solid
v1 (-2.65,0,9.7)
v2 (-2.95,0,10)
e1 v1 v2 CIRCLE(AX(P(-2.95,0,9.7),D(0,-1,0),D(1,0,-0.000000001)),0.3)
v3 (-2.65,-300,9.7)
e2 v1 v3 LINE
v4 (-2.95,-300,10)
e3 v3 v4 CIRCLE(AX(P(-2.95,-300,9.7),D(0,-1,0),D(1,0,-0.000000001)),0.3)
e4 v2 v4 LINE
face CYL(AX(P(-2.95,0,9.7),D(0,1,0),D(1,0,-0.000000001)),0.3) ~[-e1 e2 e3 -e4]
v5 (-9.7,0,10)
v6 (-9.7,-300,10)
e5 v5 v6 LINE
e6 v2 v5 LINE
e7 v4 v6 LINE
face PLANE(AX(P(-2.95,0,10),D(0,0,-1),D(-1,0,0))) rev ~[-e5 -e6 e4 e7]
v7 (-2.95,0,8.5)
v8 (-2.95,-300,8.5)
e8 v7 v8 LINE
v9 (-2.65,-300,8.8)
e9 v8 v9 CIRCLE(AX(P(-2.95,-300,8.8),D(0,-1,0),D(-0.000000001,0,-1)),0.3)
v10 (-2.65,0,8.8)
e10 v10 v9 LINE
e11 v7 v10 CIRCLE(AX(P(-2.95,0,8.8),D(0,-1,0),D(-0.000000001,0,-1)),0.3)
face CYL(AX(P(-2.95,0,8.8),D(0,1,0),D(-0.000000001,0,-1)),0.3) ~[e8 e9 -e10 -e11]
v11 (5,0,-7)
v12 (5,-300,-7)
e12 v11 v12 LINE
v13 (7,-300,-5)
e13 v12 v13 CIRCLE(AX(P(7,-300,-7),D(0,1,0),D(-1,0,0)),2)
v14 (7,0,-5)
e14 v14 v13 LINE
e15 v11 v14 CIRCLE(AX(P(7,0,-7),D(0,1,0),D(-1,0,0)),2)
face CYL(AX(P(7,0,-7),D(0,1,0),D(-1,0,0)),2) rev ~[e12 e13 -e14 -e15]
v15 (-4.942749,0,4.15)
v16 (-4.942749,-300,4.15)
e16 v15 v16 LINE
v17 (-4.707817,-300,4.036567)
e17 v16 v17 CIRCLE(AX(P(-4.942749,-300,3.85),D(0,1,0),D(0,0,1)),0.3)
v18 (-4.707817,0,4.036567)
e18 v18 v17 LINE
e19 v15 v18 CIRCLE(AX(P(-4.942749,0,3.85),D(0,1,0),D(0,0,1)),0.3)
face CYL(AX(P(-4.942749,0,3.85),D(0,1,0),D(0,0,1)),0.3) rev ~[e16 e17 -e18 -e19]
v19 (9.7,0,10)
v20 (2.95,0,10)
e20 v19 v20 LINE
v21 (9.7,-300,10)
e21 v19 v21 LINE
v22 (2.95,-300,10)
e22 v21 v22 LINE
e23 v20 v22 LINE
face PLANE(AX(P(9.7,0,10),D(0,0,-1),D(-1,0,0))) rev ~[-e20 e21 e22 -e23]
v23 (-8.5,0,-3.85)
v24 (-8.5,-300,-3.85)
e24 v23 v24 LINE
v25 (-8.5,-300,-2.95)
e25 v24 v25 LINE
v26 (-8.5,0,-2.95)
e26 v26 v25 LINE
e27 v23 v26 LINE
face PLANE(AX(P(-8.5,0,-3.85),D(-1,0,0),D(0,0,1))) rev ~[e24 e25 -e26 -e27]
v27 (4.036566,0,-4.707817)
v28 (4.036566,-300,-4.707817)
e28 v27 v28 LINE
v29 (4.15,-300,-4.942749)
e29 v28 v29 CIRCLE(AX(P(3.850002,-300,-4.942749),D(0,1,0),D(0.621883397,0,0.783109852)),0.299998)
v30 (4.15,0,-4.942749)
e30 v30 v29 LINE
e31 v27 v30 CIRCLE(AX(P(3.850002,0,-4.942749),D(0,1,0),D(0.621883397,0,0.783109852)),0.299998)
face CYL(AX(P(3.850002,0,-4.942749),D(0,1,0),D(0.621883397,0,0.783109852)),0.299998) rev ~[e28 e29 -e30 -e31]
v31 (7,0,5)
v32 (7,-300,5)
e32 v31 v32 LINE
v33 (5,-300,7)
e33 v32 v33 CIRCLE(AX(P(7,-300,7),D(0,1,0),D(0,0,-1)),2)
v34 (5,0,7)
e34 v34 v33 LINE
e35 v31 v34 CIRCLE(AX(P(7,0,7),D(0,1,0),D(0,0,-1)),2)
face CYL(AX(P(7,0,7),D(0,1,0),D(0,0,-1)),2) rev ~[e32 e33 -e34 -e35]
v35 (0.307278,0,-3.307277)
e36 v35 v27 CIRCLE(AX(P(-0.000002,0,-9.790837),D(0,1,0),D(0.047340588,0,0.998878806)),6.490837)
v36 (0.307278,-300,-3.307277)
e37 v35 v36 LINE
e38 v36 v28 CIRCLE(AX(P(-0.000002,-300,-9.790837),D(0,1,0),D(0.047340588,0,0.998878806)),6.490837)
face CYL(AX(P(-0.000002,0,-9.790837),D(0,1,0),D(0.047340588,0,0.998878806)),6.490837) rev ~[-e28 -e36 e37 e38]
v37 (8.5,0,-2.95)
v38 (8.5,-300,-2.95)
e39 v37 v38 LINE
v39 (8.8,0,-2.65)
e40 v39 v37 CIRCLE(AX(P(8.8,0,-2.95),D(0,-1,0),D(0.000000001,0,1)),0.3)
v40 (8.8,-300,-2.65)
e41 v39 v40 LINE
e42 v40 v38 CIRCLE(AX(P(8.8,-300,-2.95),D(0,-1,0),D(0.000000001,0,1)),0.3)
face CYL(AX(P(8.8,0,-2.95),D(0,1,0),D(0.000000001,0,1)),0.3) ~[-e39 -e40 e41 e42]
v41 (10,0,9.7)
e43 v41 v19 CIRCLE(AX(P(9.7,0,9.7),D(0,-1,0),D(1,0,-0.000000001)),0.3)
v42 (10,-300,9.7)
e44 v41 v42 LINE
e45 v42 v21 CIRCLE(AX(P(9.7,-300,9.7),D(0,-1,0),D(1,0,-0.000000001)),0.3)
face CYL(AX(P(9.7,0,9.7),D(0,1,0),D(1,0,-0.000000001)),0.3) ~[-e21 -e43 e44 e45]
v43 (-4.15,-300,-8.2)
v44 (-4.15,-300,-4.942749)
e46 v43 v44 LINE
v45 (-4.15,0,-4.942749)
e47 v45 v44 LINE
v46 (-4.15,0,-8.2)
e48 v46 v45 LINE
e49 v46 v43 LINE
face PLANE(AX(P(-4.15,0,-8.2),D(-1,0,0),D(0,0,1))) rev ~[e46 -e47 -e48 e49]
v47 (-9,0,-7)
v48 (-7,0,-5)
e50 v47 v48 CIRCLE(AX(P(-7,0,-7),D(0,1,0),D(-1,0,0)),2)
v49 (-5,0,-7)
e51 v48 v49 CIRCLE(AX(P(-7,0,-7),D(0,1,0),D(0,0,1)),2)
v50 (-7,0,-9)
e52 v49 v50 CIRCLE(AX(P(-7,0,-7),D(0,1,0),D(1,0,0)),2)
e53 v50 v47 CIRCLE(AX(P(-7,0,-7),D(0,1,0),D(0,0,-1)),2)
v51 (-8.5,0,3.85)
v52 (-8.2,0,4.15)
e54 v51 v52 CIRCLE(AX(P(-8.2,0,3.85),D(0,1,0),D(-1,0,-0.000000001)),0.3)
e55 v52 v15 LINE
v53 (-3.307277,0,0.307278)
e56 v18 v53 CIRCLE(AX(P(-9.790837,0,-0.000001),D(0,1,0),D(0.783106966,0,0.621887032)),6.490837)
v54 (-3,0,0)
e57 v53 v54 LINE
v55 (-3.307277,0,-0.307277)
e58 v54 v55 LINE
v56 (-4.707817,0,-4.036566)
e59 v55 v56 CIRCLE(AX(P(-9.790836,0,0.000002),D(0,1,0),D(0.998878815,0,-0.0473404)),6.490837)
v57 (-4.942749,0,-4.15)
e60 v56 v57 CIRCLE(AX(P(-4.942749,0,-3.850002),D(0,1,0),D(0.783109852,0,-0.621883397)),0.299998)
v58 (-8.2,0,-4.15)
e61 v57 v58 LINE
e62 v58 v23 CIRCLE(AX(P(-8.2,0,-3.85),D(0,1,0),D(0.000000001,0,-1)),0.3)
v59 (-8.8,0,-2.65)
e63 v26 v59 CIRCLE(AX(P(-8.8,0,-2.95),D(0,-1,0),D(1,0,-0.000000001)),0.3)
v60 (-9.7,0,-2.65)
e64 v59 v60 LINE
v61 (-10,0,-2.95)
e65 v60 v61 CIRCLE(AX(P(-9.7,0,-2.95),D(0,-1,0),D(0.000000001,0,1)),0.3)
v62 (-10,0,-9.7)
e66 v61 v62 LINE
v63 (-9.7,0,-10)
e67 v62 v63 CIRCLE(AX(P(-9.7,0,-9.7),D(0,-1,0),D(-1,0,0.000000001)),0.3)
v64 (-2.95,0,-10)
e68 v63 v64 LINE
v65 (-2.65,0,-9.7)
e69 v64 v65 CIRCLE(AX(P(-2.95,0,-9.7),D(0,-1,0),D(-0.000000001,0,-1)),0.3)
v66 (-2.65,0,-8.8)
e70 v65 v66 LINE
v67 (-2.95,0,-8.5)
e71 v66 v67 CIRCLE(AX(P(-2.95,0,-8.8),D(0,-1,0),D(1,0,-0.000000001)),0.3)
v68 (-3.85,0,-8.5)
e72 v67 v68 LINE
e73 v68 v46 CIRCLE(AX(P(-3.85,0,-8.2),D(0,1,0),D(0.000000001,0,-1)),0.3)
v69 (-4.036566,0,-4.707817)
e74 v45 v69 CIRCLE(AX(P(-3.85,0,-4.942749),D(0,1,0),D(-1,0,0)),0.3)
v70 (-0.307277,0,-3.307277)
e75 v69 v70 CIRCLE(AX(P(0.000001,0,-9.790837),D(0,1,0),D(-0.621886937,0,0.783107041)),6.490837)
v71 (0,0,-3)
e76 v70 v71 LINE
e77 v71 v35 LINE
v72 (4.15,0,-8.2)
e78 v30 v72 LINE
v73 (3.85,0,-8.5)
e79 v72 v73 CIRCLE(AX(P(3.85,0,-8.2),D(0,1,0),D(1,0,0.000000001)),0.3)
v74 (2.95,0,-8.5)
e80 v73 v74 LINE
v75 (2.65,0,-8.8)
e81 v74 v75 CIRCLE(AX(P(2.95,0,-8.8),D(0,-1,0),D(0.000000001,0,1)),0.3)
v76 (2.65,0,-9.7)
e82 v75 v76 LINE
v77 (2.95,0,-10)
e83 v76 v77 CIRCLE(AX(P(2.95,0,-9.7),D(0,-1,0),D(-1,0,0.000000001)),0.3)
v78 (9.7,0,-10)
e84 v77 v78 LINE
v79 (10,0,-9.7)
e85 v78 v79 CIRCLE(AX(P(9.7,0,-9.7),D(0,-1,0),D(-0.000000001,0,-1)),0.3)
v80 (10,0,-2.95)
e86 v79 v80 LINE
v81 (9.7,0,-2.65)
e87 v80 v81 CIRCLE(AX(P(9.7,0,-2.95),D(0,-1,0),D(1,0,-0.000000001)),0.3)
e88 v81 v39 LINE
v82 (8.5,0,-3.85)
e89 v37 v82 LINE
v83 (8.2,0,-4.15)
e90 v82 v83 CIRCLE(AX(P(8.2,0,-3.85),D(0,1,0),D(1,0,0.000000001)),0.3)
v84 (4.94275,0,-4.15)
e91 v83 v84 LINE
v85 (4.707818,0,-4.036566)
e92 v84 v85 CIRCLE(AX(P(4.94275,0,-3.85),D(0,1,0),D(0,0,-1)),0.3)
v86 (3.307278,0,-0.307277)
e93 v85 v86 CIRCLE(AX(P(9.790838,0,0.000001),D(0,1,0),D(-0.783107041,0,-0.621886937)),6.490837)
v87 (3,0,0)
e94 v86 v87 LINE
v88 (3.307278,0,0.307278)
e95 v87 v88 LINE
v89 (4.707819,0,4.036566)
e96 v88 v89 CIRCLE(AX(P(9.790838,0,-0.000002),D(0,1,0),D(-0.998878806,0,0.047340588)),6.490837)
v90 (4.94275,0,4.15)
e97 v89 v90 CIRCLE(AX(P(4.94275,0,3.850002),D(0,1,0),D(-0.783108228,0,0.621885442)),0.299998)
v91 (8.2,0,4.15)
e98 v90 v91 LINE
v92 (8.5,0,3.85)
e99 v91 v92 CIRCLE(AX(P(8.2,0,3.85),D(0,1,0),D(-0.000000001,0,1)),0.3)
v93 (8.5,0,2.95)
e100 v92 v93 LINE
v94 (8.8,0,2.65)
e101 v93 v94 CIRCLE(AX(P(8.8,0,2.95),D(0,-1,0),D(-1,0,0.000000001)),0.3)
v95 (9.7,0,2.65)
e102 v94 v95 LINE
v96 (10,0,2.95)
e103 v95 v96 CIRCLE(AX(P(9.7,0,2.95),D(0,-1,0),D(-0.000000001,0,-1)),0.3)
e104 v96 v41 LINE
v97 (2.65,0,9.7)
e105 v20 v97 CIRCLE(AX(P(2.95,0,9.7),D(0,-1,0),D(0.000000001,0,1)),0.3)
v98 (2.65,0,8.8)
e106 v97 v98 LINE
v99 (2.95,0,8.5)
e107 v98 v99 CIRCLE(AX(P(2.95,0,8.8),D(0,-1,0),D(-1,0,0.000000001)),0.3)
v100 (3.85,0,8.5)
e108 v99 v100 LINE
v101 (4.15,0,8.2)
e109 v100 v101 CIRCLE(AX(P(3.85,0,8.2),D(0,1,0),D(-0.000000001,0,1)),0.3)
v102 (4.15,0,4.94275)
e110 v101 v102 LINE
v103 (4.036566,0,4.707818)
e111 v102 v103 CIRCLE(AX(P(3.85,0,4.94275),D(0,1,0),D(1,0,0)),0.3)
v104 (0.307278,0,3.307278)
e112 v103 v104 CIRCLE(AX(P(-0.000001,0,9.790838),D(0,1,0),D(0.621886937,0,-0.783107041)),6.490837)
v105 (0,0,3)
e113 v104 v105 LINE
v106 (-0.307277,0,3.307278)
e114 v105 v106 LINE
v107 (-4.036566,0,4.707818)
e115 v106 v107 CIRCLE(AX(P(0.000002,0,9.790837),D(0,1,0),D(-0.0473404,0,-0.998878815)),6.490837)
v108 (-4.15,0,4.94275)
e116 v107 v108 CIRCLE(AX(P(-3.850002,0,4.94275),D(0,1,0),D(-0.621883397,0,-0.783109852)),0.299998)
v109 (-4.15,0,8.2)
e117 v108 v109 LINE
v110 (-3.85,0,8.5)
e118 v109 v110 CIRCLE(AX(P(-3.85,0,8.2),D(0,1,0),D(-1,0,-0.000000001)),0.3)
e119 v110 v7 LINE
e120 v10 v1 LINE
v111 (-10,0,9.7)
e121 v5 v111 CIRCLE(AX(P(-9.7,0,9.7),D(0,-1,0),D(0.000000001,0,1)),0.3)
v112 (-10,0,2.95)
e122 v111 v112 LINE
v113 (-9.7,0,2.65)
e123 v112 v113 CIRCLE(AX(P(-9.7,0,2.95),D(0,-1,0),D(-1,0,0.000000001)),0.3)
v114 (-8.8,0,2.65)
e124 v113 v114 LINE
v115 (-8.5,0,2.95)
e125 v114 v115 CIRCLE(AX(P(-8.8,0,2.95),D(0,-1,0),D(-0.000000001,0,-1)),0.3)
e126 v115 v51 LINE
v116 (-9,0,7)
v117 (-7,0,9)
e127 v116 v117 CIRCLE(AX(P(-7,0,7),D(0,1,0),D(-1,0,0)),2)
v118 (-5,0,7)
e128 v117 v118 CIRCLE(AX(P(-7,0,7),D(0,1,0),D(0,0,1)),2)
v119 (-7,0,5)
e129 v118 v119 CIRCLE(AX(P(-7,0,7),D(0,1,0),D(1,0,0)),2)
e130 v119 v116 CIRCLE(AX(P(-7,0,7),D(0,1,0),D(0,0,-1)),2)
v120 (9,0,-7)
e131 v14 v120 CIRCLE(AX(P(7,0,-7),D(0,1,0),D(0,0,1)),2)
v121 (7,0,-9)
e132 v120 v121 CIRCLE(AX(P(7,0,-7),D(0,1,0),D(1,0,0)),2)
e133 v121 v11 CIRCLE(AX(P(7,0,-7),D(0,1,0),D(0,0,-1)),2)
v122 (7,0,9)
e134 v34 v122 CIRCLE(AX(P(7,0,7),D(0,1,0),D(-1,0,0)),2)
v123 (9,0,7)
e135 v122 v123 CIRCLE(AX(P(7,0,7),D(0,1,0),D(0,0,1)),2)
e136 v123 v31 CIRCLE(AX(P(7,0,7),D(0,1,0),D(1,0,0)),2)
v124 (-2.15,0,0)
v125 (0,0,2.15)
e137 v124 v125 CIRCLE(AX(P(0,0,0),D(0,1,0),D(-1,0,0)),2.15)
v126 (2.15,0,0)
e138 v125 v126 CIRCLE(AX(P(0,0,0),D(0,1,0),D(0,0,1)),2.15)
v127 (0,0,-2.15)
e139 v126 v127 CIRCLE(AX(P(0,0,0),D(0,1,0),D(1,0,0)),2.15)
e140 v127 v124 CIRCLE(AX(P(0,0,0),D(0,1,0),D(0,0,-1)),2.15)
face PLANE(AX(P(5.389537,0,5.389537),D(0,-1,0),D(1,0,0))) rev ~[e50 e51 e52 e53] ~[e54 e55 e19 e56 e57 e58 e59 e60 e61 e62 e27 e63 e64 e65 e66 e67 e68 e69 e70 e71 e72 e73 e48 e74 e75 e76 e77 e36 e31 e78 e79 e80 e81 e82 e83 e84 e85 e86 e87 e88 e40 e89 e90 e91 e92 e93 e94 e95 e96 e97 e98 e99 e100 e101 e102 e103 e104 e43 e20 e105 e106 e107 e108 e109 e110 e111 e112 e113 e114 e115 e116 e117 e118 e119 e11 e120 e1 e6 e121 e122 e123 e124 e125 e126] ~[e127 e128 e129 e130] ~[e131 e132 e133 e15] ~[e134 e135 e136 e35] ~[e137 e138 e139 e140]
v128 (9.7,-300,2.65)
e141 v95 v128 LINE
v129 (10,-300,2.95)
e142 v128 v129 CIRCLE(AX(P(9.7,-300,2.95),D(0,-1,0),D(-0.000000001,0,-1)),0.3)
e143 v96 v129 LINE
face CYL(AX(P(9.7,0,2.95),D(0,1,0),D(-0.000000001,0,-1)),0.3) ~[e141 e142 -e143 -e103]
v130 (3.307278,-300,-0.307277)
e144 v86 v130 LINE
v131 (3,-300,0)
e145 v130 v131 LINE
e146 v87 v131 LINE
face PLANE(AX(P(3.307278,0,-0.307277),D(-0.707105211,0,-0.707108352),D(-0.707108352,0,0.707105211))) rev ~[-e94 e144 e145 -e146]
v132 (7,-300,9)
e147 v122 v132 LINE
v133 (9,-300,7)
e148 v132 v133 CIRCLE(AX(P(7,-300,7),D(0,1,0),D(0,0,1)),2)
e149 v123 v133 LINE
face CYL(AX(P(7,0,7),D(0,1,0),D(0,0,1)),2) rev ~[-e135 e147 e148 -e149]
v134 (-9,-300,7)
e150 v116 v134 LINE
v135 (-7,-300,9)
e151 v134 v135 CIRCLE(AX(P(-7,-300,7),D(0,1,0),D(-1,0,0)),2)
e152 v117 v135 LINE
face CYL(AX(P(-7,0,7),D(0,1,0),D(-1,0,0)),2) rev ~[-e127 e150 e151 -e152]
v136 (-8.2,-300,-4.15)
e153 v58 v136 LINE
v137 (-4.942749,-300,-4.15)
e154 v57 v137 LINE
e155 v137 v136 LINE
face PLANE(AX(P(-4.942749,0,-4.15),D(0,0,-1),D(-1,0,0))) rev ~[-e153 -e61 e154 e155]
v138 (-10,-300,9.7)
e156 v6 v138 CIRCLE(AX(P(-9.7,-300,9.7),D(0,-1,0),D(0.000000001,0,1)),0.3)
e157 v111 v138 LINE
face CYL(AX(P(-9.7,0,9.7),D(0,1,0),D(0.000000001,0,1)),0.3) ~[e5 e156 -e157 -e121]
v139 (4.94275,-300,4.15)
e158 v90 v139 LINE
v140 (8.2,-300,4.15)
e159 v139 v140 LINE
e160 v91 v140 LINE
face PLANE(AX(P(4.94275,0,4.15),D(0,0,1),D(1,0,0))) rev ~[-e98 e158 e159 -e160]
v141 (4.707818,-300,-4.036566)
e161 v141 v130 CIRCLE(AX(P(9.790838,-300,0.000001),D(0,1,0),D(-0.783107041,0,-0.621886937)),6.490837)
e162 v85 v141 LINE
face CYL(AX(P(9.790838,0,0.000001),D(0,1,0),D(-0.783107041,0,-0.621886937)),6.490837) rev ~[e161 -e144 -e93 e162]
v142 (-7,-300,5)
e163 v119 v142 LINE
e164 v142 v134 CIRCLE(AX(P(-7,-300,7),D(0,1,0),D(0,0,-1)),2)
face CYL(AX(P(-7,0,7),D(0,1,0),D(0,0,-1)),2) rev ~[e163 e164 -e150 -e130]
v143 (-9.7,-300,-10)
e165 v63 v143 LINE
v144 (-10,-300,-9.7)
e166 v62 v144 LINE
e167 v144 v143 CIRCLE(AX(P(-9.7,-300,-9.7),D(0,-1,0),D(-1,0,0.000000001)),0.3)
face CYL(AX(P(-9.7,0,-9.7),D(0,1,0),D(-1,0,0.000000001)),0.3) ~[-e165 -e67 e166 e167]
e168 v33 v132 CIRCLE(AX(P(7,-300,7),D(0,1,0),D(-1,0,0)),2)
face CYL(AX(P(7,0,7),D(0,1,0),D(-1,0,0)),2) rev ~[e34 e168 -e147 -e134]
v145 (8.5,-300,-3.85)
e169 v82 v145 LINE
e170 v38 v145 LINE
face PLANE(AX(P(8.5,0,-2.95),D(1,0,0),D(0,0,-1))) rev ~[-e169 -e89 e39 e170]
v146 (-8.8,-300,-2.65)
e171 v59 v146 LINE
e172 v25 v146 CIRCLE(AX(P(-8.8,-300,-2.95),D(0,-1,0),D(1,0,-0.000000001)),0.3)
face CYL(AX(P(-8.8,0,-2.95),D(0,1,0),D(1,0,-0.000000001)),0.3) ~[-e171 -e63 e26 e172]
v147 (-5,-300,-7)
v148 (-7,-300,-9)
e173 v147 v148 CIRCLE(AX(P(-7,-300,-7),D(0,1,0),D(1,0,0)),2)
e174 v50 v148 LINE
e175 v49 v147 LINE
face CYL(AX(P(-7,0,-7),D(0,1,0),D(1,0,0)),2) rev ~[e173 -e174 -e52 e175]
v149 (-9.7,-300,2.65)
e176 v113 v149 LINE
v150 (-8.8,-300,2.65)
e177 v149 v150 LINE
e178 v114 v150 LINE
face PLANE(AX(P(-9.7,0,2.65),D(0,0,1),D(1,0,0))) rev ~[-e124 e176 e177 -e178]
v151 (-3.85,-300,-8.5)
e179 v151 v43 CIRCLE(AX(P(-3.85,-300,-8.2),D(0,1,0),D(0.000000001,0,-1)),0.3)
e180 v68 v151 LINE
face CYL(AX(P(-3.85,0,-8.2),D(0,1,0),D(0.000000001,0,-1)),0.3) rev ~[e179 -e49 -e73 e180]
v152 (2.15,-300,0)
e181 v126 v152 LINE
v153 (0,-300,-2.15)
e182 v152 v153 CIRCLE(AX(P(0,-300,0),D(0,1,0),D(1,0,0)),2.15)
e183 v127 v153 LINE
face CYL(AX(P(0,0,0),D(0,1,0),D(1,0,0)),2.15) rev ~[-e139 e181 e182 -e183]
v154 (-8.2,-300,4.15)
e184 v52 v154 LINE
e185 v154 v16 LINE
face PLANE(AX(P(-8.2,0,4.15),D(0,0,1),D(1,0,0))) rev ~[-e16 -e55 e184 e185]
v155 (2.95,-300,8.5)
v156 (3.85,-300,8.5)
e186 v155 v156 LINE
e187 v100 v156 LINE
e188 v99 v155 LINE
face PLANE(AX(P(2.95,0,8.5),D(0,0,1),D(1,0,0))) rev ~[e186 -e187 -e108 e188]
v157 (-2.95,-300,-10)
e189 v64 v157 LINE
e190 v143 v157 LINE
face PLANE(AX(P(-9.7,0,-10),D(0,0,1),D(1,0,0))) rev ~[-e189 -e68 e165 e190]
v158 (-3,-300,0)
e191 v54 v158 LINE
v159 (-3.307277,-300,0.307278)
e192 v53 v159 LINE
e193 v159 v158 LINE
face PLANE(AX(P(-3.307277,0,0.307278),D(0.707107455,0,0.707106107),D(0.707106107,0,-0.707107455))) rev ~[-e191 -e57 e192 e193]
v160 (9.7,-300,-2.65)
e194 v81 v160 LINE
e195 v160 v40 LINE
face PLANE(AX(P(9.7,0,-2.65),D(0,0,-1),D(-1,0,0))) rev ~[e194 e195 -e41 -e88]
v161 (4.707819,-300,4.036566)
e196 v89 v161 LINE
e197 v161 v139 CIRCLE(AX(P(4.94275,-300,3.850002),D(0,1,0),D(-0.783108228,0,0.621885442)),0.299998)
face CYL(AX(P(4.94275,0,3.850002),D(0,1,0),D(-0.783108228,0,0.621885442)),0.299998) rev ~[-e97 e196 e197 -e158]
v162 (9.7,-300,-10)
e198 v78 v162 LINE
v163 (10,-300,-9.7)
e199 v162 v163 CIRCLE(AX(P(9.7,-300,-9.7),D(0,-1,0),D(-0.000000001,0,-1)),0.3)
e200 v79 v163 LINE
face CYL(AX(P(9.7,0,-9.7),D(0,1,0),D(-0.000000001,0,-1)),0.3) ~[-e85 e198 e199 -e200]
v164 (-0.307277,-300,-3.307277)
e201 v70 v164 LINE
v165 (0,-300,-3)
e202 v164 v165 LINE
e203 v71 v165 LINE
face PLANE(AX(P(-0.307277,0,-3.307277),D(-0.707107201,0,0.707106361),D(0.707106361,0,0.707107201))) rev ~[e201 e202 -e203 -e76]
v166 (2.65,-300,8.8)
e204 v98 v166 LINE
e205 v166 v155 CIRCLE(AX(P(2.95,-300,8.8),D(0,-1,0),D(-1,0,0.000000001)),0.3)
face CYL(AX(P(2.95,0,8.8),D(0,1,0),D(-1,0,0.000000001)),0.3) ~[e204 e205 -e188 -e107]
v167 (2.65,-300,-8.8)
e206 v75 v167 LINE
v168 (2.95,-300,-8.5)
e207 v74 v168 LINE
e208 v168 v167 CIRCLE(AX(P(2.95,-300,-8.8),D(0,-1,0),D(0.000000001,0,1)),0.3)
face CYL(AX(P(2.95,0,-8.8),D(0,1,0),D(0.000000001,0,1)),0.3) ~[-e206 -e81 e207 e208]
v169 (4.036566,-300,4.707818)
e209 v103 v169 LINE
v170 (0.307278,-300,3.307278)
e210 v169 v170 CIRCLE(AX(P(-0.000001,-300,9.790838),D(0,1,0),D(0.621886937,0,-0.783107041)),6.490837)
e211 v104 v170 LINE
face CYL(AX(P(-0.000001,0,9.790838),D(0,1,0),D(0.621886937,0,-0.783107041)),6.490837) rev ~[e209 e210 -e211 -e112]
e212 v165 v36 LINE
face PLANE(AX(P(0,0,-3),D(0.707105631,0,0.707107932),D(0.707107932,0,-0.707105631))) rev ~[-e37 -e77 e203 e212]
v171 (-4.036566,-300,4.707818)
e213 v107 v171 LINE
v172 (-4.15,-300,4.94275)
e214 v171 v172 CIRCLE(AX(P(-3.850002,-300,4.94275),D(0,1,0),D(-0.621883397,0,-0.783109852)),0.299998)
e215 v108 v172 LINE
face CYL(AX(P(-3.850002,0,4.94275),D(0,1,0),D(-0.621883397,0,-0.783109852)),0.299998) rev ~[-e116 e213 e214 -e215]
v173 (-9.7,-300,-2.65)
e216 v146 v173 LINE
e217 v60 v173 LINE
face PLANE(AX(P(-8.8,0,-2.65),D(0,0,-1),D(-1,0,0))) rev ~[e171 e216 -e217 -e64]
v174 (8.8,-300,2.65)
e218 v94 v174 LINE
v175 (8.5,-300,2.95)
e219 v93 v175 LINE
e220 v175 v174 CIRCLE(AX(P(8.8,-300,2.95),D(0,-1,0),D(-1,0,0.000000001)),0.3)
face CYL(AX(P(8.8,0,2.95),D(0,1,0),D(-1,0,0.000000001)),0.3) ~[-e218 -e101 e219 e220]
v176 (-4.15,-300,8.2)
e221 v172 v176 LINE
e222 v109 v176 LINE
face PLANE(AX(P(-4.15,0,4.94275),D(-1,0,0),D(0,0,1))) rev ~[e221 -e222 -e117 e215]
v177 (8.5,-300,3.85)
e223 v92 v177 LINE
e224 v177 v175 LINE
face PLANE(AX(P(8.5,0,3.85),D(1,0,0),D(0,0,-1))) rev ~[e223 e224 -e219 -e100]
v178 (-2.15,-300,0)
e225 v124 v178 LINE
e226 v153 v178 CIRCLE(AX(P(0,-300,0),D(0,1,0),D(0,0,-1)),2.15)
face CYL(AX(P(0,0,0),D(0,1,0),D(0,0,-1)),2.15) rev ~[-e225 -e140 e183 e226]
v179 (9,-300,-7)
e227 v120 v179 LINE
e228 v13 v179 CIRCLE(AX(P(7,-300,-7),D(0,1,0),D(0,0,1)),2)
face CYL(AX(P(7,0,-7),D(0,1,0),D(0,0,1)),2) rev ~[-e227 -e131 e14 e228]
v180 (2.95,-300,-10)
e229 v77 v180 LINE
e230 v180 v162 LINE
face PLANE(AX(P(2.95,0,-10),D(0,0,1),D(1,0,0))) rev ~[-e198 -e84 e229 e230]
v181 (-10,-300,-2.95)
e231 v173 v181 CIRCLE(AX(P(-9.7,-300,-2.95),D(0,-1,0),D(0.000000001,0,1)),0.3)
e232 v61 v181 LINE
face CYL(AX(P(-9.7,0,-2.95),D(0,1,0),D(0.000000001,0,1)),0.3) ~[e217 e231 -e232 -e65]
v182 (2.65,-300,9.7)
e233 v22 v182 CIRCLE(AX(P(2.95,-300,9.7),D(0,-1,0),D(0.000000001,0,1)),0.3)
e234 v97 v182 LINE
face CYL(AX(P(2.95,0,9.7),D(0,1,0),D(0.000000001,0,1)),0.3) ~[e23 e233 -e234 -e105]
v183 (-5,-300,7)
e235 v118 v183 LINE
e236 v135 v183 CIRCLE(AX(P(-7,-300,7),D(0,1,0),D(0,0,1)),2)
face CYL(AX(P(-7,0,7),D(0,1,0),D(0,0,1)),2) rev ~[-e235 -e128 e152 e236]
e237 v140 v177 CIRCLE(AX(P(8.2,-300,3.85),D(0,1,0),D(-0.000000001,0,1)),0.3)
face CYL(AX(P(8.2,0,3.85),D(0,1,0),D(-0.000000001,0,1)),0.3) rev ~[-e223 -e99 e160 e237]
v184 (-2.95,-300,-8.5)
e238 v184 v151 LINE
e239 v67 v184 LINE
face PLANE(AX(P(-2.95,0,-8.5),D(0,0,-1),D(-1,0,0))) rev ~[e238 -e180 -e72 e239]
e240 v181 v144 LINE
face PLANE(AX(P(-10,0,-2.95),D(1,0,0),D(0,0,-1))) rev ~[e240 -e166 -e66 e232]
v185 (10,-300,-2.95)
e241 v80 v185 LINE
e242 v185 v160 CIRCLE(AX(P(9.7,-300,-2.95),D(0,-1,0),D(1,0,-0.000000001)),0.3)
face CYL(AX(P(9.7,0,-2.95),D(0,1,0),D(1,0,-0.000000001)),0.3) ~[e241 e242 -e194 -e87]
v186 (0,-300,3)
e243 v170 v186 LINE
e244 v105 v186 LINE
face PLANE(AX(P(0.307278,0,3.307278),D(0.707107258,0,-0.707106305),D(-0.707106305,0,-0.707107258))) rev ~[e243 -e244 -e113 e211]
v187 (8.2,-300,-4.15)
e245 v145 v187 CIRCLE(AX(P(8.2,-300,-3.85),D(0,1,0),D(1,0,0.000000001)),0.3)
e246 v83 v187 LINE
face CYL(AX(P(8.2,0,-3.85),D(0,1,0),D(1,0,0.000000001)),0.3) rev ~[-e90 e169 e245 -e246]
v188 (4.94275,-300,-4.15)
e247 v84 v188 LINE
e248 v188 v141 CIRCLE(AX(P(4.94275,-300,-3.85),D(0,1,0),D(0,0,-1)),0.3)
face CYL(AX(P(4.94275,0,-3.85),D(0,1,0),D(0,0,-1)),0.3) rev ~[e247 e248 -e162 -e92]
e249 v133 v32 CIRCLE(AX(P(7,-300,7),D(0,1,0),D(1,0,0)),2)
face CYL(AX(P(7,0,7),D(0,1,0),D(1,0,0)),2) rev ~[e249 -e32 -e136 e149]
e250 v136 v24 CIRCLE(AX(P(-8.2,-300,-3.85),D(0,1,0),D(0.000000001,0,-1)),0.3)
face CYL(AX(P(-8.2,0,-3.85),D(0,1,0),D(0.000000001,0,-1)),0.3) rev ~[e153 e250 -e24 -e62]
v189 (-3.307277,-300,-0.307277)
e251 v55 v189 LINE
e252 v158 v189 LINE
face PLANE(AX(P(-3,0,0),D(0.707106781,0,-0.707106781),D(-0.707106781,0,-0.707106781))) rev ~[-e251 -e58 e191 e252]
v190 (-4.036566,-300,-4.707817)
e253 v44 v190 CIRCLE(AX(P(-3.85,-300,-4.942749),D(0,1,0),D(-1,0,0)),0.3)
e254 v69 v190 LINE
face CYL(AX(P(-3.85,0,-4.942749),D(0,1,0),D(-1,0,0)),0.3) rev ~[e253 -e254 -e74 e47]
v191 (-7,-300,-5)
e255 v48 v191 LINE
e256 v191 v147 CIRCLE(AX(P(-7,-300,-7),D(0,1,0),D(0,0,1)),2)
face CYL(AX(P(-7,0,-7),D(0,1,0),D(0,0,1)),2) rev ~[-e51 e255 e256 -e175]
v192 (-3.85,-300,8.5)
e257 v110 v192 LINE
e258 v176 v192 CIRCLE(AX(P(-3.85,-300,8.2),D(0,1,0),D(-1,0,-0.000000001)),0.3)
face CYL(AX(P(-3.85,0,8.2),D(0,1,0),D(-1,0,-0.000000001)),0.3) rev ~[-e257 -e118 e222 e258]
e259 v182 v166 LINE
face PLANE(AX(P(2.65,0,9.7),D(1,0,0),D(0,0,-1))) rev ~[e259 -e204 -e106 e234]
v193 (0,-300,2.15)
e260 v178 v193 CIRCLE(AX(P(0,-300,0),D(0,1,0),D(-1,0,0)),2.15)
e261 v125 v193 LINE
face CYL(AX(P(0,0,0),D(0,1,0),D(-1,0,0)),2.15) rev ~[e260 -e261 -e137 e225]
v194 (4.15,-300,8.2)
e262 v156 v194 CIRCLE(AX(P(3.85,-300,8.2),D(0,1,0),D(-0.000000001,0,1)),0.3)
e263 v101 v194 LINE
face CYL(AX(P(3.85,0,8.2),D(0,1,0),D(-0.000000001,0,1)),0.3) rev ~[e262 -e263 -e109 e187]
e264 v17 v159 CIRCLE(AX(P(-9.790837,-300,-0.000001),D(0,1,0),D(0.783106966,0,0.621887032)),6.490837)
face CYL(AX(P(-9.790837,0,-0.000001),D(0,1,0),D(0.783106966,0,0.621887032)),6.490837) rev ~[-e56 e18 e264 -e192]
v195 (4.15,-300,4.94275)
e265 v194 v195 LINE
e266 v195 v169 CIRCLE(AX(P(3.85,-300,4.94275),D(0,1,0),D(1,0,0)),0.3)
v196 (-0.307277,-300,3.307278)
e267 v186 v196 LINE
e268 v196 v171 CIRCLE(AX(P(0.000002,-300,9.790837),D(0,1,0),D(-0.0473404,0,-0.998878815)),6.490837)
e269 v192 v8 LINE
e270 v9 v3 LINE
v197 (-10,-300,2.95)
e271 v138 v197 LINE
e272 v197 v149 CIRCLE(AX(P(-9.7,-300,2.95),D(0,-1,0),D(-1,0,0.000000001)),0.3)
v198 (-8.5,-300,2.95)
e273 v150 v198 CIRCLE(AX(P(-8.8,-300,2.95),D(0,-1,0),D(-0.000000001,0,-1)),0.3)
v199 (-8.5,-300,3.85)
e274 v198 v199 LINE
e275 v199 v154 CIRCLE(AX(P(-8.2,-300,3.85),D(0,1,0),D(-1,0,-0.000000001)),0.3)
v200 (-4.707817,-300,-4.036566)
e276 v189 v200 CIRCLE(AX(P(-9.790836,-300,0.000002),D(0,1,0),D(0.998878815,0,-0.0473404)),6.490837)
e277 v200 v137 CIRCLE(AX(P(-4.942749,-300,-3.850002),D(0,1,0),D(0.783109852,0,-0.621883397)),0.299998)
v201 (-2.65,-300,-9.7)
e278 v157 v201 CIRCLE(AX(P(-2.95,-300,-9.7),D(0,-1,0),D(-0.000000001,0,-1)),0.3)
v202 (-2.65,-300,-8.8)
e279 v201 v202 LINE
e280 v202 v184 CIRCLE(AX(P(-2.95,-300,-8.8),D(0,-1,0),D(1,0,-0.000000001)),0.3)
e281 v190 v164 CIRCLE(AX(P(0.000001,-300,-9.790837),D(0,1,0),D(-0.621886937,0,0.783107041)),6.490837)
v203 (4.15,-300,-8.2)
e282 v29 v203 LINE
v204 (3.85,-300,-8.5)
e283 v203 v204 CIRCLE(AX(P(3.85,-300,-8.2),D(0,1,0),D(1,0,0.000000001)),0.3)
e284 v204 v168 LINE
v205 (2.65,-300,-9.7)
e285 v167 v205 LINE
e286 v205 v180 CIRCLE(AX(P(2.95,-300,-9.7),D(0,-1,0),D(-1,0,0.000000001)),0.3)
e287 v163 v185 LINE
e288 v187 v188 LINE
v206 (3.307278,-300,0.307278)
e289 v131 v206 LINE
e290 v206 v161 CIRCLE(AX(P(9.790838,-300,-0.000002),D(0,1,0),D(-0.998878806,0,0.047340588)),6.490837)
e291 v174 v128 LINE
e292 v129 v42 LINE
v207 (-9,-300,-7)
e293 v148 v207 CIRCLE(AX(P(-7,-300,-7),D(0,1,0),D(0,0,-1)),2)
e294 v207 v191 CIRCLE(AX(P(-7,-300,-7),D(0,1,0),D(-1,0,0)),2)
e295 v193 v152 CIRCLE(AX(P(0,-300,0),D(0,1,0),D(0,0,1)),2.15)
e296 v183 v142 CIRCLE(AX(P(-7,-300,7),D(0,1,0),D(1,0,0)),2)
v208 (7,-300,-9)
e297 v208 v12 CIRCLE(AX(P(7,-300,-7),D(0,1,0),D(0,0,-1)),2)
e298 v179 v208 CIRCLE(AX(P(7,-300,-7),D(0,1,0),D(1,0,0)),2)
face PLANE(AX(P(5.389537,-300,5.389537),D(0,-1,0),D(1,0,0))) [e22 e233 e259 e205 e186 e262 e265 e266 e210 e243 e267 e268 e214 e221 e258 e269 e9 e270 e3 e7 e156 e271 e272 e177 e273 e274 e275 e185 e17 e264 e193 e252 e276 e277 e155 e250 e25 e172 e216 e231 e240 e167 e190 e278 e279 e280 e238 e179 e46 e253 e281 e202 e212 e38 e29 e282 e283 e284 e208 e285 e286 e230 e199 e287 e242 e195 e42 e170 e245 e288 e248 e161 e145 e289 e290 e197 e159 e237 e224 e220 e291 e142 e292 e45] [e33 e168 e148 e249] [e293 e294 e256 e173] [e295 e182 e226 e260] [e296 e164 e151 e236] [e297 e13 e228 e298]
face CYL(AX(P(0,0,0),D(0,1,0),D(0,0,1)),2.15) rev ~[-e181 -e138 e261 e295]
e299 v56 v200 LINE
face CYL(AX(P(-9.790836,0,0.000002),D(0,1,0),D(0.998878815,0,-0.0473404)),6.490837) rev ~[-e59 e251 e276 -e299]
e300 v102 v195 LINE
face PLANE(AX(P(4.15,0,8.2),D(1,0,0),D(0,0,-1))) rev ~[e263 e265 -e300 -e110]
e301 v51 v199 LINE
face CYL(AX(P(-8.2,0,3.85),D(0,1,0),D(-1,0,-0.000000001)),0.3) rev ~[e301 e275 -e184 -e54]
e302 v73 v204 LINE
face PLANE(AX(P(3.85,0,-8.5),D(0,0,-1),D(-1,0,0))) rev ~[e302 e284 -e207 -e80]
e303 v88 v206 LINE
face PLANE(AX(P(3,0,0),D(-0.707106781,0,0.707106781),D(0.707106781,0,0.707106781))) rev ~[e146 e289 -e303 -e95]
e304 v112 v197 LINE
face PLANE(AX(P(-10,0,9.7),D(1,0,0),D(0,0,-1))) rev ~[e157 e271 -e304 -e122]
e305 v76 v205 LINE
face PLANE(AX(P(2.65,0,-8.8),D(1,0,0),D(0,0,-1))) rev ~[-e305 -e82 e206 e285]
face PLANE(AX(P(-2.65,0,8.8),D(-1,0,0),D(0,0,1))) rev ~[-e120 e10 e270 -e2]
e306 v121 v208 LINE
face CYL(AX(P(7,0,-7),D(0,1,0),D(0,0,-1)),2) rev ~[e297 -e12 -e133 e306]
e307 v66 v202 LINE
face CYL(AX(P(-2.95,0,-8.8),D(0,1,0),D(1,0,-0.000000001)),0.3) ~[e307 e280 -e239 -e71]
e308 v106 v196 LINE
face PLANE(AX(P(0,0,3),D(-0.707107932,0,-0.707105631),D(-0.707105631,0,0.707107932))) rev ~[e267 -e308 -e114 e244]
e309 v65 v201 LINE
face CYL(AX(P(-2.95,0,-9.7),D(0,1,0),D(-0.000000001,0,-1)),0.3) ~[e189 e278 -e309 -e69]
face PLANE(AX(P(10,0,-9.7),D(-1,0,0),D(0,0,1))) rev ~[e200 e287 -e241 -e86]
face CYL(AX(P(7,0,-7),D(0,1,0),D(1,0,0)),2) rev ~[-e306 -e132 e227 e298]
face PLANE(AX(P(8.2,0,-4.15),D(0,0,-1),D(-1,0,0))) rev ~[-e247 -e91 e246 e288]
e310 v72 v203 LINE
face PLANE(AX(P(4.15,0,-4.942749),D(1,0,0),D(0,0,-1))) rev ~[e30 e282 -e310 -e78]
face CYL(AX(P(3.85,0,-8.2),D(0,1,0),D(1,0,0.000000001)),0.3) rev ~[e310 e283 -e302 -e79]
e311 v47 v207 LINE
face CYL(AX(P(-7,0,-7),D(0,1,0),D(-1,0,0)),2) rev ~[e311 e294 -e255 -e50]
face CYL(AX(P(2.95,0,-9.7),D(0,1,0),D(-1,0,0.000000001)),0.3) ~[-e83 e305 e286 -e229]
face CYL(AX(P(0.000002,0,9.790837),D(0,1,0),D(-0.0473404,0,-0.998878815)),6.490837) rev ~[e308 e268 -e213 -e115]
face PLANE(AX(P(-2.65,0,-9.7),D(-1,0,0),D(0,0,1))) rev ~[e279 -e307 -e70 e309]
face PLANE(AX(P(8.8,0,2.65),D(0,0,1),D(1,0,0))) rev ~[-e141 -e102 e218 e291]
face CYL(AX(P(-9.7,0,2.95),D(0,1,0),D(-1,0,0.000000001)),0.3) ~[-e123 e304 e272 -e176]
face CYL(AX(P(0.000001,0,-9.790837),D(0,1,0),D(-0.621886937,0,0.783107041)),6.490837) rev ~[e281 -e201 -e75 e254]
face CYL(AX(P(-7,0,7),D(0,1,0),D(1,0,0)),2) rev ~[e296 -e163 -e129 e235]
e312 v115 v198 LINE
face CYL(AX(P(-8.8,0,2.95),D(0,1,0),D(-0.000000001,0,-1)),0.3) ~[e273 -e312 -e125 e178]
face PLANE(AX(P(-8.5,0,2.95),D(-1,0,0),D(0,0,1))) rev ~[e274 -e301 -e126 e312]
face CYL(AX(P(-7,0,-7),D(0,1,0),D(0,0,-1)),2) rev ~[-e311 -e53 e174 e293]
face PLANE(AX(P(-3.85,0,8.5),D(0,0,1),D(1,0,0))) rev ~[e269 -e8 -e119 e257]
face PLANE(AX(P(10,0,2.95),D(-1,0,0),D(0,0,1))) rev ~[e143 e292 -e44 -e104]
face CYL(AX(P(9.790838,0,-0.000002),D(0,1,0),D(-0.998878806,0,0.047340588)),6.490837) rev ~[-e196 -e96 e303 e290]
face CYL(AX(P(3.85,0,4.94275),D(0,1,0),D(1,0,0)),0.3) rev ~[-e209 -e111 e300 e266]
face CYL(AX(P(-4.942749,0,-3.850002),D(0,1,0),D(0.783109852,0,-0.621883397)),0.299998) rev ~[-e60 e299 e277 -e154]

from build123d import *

# Parameters (mm, degrees)
F1_DEPTH = 300


# Not quite as in the source:
# - ends of sketch curves that miss each other by under 0.0002 mm in the source are joined


with BuildPart() as f1:
    # F0 (on Front) → F1 (new body)
    with BuildSketch(Plane.XZ):
        with BuildLine():
            ThreePointArc((0, 2.15), (1.5202795796, 1.5202795796), (2.15, 0))
            Line((2.15, 0), (3, 0))
            Line((3, 0), (3.307278, 0.307278))
            ThreePointArc((3.307278, 0.307278), (3.7143803747, 2.2820219924), (4.7078187099, 4.0365664363))
            ThreePointArc((4.7078187099, 4.0365664363), (4.812308461, 4.1201573706), (4.94275, 4.15))
            Line((4.94275, 4.15), (8.2, 4.15))
            ThreePointArc((8.2, 4.15), (8.4121320344, 4.0621320344), (8.5, 3.85))
            Line((8.5, 3.85), (8.5, 2.95))
            ThreePointArc((8.5, 2.95), (8.5878679656, 2.7378679656), (8.8, 2.65))
            Line((8.8, 2.65), (9.7, 2.65))
            ThreePointArc((9.7, 2.65), (9.9121320344, 2.7378679656), (10, 2.95))
            Line((10, 2.95), (10, 9.7))
            ThreePointArc((10, 9.7), (9.9121320344, 9.9121320344), (9.7, 10))
            Line((9.7, 10), (2.95, 10))
            ThreePointArc((2.95, 10), (2.7378679656, 9.9121320344), (2.65, 9.7))
            Line((2.65, 9.7), (2.65, 8.8))
            ThreePointArc((2.65, 8.8), (2.7378679656, 8.5878679656), (2.95, 8.5))
            Line((2.95, 8.5), (3.85, 8.5))
            ThreePointArc((3.85, 8.5), (4.0621320344, 8.4121320344), (4.15, 8.2))
            Line((4.15, 8.2), (4.15, 4.94275))
            ThreePointArc((4.15, 4.94275), (4.1201572004, 4.8123081084), (4.036566086, 4.7078178916))
            ThreePointArc((4.036566086, 4.7078178916), (2.2820216259, 3.7143802371), (0.3072779813, 3.3072783955))
            Line((0.3072779813, 3.3072783955), (0, 3))
            Line((0, 3), (0, 2.15))
        make_face()
        with BuildLine():
            ThreePointArc((7, 9), (8.4142135624, 8.4142135624), (9, 7))
            ThreePointArc((9, 7), (8.4142135624, 5.5857864376), (7, 5))
            ThreePointArc((7, 5), (5.5857864376, 5.5857864376), (5, 7))
            ThreePointArc((5, 7), (5.5857864376, 8.4142135624), (7, 9))
        make_face(mode=Mode.SUBTRACT)
        with BuildLine():
            Line((3, 0), (2.15, 0))
            ThreePointArc((2.15, 0), (1.5202795796, -1.5202795796), (0, -2.15))
            Line((0, -2.15), (0, -3))
            Line((0, -3), (0.307278, -3.307277))
            ThreePointArc((0.307278, -3.307277), (2.2820216259, -3.7143792371), (4.036565823, -4.7078172229))
            ThreePointArc((4.036565823, -4.7078172229), (4.1201572004, -4.8123071084), (4.15, -4.942749))
            Line((4.15, -4.942749), (4.15, -8.2))
            ThreePointArc((4.15, -8.2), (4.0621320344, -8.4121320344), (3.85, -8.5))
            Line((3.85, -8.5), (2.95, -8.5))
            ThreePointArc((2.95, -8.5), (2.7378679656, -8.5878679656), (2.65, -8.8))
            Line((2.65, -8.8), (2.65, -9.7))
            ThreePointArc((2.65, -9.7), (2.7378679656, -9.9121320344), (2.95, -10))
            Line((2.95, -10), (9.7, -10))
            ThreePointArc((9.7, -10), (9.9121320344, -9.9121320344), (10, -9.7))
            Line((10, -9.7), (10, -2.95))
            ThreePointArc((10, -2.95), (9.9121320344, -2.7378679656), (9.7, -2.65))
            Line((9.7, -2.65), (8.8, -2.65))
            ThreePointArc((8.8, -2.65), (8.5878679656, -2.7378679656), (8.5, -2.95))
            Line((8.5, -2.95), (8.5, -3.85))
            ThreePointArc((8.5, -3.85), (8.4121320344, -4.0621320344), (8.2, -4.15))
            Line((8.2, -4.15), (4.94275, -4.15))
            ThreePointArc((4.94275, -4.15), (4.8123081084, -4.1201572004), (4.7078178916, -4.036566086))
            ThreePointArc((4.7078178916, -4.036566086), (3.7143800615, -2.2820211583), (3.3072783483, -0.3072769835))
            Line((3.3072783483, -0.3072769835), (3, 0))
        make_face()
        with BuildLine():
            ThreePointArc((7, -5), (8.4142135624, -5.5857864376), (9, -7))
            ThreePointArc((9, -7), (8.4142135624, -8.4142135624), (7, -9))
            ThreePointArc((7, -9), (5.5857864376, -8.4142135624), (5, -7))
            ThreePointArc((5, -7), (5.5857864376, -5.5857864376), (7, -5))
        make_face(mode=Mode.SUBTRACT)
        with BuildLine():
            Line((0, -3), (0, -2.15))
            ThreePointArc((0, -2.15), (-1.5202795796, -1.5202795796), (-2.15, 0))
            Line((-2.15, 0), (-3, 0))
            Line((-3, 0), (-3.307277, -0.307277))
            ThreePointArc((-3.307277, -0.307277), (-3.7143790615, -2.2820211583), (-4.7078172229, -4.036565823))
            ThreePointArc((-4.7078172229, -4.036565823), (-4.8123071084, -4.1201572004), (-4.942749, -4.15))
            Line((-4.942749, -4.15), (-8.2, -4.15))
            ThreePointArc((-8.2, -4.15), (-8.4121320344, -4.0621320344), (-8.5, -3.85))
            Line((-8.5, -3.85), (-8.5, -2.95))
            ThreePointArc((-8.5, -2.95), (-8.5878679656, -2.7378679656), (-8.8, -2.65))
            Line((-8.8, -2.65), (-9.7, -2.65))
            ThreePointArc((-9.7, -2.65), (-9.9121320344, -2.7378679656), (-10, -2.95))
            Line((-10, -2.95), (-10, -9.7))
            ThreePointArc((-10, -9.7), (-9.9121320344, -9.9121320344), (-9.7, -10))
            Line((-9.7, -10), (-2.95, -10))
            ThreePointArc((-2.95, -10), (-2.7378679656, -9.9121320344), (-2.65, -9.7))
            Line((-2.65, -9.7), (-2.65, -8.8))
            ThreePointArc((-2.65, -8.8), (-2.7378679656, -8.5878679656), (-2.95, -8.5))
            Line((-2.95, -8.5), (-3.85, -8.5))
            ThreePointArc((-3.85, -8.5), (-4.0621320344, -8.4121320344), (-4.15, -8.2))
            Line((-4.15, -8.2), (-4.15, -4.942749))
            ThreePointArc((-4.15, -4.942749), (-4.1201572004, -4.8123071084), (-4.036566086, -4.7078168916))
            ThreePointArc((-4.036566086, -4.7078168916), (-2.2820211583, -3.7143790615), (-0.3072769835, -3.3072773483))
            Line((-0.3072769835, -3.3072773483), (0, -3))
        make_face()
        with BuildLine():
            ThreePointArc((-7, -9), (-8.4142135624, -8.4142135624), (-9, -7))
            ThreePointArc((-9, -7), (-8.4142135624, -5.5857864376), (-7, -5))
            ThreePointArc((-7, -5), (-5.5857864376, -5.5857864376), (-5, -7))
            ThreePointArc((-5, -7), (-5.5857864376, -8.4142135624), (-7, -9))
        make_face(mode=Mode.SUBTRACT)
        with BuildLine():
            ThreePointArc((-2.15, 0), (-1.5202795796, 1.5202795796), (0, 2.15))
            Line((0, 2.15), (0, 3))
            Line((0, 3), (-0.307277, 3.307278))
            ThreePointArc((-0.307277, 3.307278), (-2.2820211583, 3.7143800615), (-4.036565823, 4.7078182229))
            ThreePointArc((-4.036565823, 4.7078182229), (-4.1201572004, 4.8123081084), (-4.15, 4.94275))
            Line((-4.15, 4.94275), (-4.15, 8.2))
            ThreePointArc((-4.15, 8.2), (-4.0621320344, 8.4121320344), (-3.85, 8.5))
            Line((-3.85, 8.5), (-2.95, 8.5))
            ThreePointArc((-2.95, 8.5), (-2.7378679656, 8.5878679656), (-2.65, 8.8))
            Line((-2.65, 8.8), (-2.65, 9.7))
            ThreePointArc((-2.65, 9.7), (-2.7378679656, 9.9121320344), (-2.95, 10))
            Line((-2.95, 10), (-9.7, 10))
            ThreePointArc((-9.7, 10), (-9.9121320344, 9.9121320344), (-10, 9.7))
            Line((-10, 9.7), (-10, 2.95))
            ThreePointArc((-10, 2.95), (-9.9121320344, 2.7378679656), (-9.7, 2.65))
            Line((-9.7, 2.65), (-8.8, 2.65))
            ThreePointArc((-8.8, 2.65), (-8.5878679656, 2.7378679656), (-8.5, 2.95))
            Line((-8.5, 2.95), (-8.5, 3.85))
            ThreePointArc((-8.5, 3.85), (-8.4121320344, 4.0621320344), (-8.2, 4.15))
            Line((-8.2, 4.15), (-4.942749, 4.15))
            ThreePointArc((-4.942749, 4.15), (-4.812307461, 4.1201573706), (-4.7078173786, 4.0365666993))
            ThreePointArc((-4.7078173786, 4.0365666993), (-3.7143793747, 2.2820219924), (-3.3072773955, 0.3072779813))
            Line((-3.3072773955, 0.3072779813), (-3, 0))
            Line((-3, 0), (-2.15, 0))
        make_face()
        with BuildLine():
            ThreePointArc((-7, 5), (-8.4142135624, 5.5857864376), (-9, 7))
            ThreePointArc((-9, 7), (-8.4142135624, 8.4142135624), (-7, 9))
            ThreePointArc((-7, 9), (-5.5857864376, 8.4142135624), (-5, 7))
            ThreePointArc((-5, 7), (-5.5857864376, 5.5857864376), (-7, 5))
        make_face(mode=Mode.SUBTRACT)
    extrude(amount=F1_DEPTH)


solid = f1.part
